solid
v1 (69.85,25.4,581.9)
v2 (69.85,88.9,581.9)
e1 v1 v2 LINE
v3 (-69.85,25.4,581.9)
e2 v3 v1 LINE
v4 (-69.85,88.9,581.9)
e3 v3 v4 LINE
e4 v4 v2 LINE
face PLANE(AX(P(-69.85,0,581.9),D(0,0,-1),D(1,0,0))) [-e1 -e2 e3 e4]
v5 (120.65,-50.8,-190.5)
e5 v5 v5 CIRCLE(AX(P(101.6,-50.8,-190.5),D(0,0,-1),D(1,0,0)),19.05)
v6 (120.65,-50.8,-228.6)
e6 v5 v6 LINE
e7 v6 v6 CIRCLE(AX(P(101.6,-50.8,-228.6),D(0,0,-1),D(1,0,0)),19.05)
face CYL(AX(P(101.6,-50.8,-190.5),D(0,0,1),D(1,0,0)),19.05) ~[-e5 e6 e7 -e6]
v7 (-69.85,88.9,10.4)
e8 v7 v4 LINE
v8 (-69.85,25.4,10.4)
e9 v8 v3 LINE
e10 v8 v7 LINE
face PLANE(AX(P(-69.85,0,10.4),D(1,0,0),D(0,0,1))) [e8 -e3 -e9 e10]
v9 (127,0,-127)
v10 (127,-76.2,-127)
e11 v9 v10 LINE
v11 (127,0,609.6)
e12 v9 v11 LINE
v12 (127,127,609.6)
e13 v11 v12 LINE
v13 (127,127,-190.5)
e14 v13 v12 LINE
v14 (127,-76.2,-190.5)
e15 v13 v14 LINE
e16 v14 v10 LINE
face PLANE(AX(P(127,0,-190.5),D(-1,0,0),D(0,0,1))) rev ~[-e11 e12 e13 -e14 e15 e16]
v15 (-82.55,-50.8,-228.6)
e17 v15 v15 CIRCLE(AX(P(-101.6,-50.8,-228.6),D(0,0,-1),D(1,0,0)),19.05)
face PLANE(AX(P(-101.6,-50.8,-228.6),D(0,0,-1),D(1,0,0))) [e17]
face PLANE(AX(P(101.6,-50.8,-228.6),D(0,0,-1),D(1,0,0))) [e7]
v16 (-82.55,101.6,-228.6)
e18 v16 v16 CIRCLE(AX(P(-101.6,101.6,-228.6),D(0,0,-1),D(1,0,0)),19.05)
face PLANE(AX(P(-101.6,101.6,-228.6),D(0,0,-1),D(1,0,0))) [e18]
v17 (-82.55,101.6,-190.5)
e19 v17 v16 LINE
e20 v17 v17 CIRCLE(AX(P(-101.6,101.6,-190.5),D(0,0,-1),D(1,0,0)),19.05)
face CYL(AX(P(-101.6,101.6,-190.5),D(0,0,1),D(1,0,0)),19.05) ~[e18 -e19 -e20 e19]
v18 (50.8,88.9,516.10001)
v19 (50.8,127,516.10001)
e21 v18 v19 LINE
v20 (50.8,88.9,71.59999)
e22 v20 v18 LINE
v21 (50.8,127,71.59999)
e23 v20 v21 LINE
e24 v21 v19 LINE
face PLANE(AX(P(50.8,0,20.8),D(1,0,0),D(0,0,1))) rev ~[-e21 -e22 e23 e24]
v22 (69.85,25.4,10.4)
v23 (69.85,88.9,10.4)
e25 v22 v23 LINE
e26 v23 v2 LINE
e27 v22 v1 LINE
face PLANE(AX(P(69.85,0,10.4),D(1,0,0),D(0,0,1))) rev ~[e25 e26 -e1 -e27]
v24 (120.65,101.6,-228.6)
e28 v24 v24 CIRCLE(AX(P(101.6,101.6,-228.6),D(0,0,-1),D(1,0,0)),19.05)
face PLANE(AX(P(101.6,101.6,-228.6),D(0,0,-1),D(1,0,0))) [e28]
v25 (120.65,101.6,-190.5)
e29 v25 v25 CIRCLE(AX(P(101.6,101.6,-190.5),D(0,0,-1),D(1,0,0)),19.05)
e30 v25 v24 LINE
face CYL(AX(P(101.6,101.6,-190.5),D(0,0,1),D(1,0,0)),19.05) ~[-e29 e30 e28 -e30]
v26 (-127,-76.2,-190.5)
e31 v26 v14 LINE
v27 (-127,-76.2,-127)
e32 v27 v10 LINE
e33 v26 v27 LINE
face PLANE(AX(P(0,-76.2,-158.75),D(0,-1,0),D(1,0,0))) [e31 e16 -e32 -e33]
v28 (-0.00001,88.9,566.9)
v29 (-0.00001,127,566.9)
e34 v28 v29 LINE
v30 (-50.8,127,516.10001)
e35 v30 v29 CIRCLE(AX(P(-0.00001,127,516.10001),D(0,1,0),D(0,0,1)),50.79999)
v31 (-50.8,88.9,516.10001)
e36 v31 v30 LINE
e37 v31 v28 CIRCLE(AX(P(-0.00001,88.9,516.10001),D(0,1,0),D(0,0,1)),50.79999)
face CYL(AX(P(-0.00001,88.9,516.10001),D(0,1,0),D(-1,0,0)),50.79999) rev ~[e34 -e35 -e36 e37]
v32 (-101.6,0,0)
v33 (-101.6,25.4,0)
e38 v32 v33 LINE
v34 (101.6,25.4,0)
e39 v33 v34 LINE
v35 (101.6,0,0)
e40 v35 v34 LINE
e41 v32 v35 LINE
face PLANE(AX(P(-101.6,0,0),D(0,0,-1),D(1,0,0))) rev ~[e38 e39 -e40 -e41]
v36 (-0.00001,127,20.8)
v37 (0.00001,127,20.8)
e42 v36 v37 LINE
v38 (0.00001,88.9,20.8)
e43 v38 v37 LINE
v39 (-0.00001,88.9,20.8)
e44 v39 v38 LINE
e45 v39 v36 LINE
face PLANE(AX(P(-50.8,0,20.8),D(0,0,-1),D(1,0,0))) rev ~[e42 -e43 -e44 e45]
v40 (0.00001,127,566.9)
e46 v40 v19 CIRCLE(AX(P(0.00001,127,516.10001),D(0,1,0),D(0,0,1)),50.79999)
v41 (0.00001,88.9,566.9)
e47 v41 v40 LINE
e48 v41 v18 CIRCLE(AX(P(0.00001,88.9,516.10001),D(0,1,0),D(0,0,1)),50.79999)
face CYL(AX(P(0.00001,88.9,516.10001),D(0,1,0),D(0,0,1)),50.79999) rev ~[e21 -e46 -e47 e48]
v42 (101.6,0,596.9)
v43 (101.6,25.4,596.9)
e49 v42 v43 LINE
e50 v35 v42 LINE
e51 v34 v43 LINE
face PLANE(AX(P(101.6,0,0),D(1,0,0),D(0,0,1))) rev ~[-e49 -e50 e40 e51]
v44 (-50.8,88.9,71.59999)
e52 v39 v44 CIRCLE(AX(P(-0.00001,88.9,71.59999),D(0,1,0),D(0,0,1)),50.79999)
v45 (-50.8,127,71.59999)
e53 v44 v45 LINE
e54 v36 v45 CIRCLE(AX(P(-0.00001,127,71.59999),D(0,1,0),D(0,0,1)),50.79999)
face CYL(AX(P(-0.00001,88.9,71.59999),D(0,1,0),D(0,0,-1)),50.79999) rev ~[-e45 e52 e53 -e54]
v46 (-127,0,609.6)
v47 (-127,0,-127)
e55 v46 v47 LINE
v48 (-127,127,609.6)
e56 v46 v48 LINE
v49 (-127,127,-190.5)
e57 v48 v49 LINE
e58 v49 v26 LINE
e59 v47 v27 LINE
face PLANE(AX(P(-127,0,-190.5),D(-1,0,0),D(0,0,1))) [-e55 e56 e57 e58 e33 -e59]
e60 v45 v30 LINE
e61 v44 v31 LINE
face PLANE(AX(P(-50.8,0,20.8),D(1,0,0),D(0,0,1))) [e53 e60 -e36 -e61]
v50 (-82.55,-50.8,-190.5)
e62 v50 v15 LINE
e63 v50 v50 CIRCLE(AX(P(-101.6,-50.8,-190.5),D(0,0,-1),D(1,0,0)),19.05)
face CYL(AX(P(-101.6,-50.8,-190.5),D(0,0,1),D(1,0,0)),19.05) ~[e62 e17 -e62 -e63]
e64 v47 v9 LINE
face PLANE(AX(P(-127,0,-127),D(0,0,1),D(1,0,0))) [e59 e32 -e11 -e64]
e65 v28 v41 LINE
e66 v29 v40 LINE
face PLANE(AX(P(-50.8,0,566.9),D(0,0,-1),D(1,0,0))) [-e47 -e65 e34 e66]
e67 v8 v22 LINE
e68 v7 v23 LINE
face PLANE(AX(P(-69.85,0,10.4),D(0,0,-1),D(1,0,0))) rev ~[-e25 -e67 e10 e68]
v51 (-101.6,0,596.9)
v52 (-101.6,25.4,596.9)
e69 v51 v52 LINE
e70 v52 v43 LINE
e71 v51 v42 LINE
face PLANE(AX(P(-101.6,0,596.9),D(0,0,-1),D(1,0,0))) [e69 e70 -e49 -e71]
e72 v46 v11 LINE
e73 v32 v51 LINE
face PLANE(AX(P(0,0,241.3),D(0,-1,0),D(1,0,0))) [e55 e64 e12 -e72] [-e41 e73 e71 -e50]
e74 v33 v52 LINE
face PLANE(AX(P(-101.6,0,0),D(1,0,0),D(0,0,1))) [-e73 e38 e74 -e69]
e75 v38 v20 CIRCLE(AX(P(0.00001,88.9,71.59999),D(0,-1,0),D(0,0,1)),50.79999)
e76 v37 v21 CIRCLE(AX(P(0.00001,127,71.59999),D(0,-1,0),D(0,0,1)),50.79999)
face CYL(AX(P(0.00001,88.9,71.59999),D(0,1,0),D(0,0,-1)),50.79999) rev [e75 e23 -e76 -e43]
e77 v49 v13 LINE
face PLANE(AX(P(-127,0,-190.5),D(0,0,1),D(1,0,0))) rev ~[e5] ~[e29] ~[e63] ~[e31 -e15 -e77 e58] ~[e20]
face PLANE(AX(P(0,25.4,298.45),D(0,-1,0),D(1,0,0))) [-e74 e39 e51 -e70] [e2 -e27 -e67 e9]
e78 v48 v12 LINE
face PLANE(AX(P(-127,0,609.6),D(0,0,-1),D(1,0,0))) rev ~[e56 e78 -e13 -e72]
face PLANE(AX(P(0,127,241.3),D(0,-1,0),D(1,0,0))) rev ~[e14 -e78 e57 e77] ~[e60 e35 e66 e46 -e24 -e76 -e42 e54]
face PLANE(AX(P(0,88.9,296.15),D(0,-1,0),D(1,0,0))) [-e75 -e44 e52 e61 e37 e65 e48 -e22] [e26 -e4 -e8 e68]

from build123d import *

# Parameters (mm, degrees)
F0_W     = 254
F0_H     = 736.6
F0_W_2   = 203.2
F0_H_2   = 596.9
F0_W_3   = 139.7
F0_H_3   = 571.5
F0_W_4   = 101.6
F0_H_4   = 546.1
F0_H_5   = 63.5
F1_DEPTH = 127
F2_DEPTH = 25.4
F3_DEPTH = 88.9
F4_R     = 50.79999
F5_DEPTH = 76.2
F6_R     = 19.05
F7_DEPTH = 38.1


# Not quite as in the source:
# - a fillet or chamfer is up to 0.001 mm smaller than in the source, because OpenCascade refuses the exact size
# - a feature names something its author has since deleted; it is built from what else it names


with BuildPart() as f1:
    # F0 (on Front) → F1 (new body)
    with BuildSketch(Plane.XZ):
        with Locations((0, 241.3)):
            Rectangle(F0_W, F0_H)
        with Locations((0, 298.45)):
            Rectangle(F0_W_2, F0_H_2, mode=Mode.SUBTRACT)
        with Locations((0, 298.45)):
            Rectangle(F0_W_2, F0_H_2)
        with Locations((0, 296.15)):
            Rectangle(F0_W_3, F0_H_3, mode=Mode.SUBTRACT)
        with Locations((0, 296.15)):
            Rectangle(F0_W_3, F0_H_3)
        with Locations((0, 293.85)):
            Rectangle(F0_W_4, F0_H_4, mode=Mode.SUBTRACT)
        with Locations((0, -158.75)):
            Rectangle(F0_W, F0_H_5)
    extrude(amount=-F1_DEPTH)

    # F0 (on Front) → F2 (cut)
    with BuildSketch(Plane.XZ):
        with Locations((0, 298.45)):
            Rectangle(F0_W_2, F0_H_2)
        with Locations((0, 296.15)):
            Rectangle(F0_W_3, F0_H_3, mode=Mode.SUBTRACT)
    extrude(amount=-F2_DEPTH, mode=Mode.SUBTRACT)

    # F0 (on Front) → F3 (cut)
    with BuildSketch(Plane.XZ):
        with Locations((0, 296.15)):
            Rectangle(F0_W_3, F0_H_3)
        with Locations((0, 293.85)):
            Rectangle(F0_W_4, F0_H_4, mode=Mode.SUBTRACT)
    extrude(amount=-F3_DEPTH, mode=Mode.SUBTRACT)

    # F4 (radius 50.8 in the source; OpenCascade refuses exactly that, so slightly less here)
    f4_edges = [f1.edges().sort_by_distance(p)[0] for p in [
        (50.8, 107.95, 566.9),
        (-50.8, 107.95, 566.9),
        (-50.8, 107.95, 20.8),
        (50.8, 107.95, 20.8),
    ]]
    fillet(f4_edges, radius=F4_R)

    # F0 (on Front) → F5 (join)
    with BuildSketch(Plane.XZ):
        with Locations((0, -158.75)):
            Rectangle(F0_W, F0_H_5)
    extrude(amount=F5_DEPTH)

    # F6 (on face) → F7 (join)
    with BuildSketch(Plane(origin=(0, 0, -190.5), x_dir=(1, 0, 0), z_dir=(0, 0, -1))):
        with Locations((-101.6, 50.8)):
            Circle(F6_R)
        with Locations((101.6, 50.8)):
            Circle(F6_R)
        with Locations((-101.6, -101.6)):
            Circle(F6_R)
        with Locations((101.6, -101.6)):
            Circle(F6_R)
    extrude(amount=F7_DEPTH)


solid = f1.part
